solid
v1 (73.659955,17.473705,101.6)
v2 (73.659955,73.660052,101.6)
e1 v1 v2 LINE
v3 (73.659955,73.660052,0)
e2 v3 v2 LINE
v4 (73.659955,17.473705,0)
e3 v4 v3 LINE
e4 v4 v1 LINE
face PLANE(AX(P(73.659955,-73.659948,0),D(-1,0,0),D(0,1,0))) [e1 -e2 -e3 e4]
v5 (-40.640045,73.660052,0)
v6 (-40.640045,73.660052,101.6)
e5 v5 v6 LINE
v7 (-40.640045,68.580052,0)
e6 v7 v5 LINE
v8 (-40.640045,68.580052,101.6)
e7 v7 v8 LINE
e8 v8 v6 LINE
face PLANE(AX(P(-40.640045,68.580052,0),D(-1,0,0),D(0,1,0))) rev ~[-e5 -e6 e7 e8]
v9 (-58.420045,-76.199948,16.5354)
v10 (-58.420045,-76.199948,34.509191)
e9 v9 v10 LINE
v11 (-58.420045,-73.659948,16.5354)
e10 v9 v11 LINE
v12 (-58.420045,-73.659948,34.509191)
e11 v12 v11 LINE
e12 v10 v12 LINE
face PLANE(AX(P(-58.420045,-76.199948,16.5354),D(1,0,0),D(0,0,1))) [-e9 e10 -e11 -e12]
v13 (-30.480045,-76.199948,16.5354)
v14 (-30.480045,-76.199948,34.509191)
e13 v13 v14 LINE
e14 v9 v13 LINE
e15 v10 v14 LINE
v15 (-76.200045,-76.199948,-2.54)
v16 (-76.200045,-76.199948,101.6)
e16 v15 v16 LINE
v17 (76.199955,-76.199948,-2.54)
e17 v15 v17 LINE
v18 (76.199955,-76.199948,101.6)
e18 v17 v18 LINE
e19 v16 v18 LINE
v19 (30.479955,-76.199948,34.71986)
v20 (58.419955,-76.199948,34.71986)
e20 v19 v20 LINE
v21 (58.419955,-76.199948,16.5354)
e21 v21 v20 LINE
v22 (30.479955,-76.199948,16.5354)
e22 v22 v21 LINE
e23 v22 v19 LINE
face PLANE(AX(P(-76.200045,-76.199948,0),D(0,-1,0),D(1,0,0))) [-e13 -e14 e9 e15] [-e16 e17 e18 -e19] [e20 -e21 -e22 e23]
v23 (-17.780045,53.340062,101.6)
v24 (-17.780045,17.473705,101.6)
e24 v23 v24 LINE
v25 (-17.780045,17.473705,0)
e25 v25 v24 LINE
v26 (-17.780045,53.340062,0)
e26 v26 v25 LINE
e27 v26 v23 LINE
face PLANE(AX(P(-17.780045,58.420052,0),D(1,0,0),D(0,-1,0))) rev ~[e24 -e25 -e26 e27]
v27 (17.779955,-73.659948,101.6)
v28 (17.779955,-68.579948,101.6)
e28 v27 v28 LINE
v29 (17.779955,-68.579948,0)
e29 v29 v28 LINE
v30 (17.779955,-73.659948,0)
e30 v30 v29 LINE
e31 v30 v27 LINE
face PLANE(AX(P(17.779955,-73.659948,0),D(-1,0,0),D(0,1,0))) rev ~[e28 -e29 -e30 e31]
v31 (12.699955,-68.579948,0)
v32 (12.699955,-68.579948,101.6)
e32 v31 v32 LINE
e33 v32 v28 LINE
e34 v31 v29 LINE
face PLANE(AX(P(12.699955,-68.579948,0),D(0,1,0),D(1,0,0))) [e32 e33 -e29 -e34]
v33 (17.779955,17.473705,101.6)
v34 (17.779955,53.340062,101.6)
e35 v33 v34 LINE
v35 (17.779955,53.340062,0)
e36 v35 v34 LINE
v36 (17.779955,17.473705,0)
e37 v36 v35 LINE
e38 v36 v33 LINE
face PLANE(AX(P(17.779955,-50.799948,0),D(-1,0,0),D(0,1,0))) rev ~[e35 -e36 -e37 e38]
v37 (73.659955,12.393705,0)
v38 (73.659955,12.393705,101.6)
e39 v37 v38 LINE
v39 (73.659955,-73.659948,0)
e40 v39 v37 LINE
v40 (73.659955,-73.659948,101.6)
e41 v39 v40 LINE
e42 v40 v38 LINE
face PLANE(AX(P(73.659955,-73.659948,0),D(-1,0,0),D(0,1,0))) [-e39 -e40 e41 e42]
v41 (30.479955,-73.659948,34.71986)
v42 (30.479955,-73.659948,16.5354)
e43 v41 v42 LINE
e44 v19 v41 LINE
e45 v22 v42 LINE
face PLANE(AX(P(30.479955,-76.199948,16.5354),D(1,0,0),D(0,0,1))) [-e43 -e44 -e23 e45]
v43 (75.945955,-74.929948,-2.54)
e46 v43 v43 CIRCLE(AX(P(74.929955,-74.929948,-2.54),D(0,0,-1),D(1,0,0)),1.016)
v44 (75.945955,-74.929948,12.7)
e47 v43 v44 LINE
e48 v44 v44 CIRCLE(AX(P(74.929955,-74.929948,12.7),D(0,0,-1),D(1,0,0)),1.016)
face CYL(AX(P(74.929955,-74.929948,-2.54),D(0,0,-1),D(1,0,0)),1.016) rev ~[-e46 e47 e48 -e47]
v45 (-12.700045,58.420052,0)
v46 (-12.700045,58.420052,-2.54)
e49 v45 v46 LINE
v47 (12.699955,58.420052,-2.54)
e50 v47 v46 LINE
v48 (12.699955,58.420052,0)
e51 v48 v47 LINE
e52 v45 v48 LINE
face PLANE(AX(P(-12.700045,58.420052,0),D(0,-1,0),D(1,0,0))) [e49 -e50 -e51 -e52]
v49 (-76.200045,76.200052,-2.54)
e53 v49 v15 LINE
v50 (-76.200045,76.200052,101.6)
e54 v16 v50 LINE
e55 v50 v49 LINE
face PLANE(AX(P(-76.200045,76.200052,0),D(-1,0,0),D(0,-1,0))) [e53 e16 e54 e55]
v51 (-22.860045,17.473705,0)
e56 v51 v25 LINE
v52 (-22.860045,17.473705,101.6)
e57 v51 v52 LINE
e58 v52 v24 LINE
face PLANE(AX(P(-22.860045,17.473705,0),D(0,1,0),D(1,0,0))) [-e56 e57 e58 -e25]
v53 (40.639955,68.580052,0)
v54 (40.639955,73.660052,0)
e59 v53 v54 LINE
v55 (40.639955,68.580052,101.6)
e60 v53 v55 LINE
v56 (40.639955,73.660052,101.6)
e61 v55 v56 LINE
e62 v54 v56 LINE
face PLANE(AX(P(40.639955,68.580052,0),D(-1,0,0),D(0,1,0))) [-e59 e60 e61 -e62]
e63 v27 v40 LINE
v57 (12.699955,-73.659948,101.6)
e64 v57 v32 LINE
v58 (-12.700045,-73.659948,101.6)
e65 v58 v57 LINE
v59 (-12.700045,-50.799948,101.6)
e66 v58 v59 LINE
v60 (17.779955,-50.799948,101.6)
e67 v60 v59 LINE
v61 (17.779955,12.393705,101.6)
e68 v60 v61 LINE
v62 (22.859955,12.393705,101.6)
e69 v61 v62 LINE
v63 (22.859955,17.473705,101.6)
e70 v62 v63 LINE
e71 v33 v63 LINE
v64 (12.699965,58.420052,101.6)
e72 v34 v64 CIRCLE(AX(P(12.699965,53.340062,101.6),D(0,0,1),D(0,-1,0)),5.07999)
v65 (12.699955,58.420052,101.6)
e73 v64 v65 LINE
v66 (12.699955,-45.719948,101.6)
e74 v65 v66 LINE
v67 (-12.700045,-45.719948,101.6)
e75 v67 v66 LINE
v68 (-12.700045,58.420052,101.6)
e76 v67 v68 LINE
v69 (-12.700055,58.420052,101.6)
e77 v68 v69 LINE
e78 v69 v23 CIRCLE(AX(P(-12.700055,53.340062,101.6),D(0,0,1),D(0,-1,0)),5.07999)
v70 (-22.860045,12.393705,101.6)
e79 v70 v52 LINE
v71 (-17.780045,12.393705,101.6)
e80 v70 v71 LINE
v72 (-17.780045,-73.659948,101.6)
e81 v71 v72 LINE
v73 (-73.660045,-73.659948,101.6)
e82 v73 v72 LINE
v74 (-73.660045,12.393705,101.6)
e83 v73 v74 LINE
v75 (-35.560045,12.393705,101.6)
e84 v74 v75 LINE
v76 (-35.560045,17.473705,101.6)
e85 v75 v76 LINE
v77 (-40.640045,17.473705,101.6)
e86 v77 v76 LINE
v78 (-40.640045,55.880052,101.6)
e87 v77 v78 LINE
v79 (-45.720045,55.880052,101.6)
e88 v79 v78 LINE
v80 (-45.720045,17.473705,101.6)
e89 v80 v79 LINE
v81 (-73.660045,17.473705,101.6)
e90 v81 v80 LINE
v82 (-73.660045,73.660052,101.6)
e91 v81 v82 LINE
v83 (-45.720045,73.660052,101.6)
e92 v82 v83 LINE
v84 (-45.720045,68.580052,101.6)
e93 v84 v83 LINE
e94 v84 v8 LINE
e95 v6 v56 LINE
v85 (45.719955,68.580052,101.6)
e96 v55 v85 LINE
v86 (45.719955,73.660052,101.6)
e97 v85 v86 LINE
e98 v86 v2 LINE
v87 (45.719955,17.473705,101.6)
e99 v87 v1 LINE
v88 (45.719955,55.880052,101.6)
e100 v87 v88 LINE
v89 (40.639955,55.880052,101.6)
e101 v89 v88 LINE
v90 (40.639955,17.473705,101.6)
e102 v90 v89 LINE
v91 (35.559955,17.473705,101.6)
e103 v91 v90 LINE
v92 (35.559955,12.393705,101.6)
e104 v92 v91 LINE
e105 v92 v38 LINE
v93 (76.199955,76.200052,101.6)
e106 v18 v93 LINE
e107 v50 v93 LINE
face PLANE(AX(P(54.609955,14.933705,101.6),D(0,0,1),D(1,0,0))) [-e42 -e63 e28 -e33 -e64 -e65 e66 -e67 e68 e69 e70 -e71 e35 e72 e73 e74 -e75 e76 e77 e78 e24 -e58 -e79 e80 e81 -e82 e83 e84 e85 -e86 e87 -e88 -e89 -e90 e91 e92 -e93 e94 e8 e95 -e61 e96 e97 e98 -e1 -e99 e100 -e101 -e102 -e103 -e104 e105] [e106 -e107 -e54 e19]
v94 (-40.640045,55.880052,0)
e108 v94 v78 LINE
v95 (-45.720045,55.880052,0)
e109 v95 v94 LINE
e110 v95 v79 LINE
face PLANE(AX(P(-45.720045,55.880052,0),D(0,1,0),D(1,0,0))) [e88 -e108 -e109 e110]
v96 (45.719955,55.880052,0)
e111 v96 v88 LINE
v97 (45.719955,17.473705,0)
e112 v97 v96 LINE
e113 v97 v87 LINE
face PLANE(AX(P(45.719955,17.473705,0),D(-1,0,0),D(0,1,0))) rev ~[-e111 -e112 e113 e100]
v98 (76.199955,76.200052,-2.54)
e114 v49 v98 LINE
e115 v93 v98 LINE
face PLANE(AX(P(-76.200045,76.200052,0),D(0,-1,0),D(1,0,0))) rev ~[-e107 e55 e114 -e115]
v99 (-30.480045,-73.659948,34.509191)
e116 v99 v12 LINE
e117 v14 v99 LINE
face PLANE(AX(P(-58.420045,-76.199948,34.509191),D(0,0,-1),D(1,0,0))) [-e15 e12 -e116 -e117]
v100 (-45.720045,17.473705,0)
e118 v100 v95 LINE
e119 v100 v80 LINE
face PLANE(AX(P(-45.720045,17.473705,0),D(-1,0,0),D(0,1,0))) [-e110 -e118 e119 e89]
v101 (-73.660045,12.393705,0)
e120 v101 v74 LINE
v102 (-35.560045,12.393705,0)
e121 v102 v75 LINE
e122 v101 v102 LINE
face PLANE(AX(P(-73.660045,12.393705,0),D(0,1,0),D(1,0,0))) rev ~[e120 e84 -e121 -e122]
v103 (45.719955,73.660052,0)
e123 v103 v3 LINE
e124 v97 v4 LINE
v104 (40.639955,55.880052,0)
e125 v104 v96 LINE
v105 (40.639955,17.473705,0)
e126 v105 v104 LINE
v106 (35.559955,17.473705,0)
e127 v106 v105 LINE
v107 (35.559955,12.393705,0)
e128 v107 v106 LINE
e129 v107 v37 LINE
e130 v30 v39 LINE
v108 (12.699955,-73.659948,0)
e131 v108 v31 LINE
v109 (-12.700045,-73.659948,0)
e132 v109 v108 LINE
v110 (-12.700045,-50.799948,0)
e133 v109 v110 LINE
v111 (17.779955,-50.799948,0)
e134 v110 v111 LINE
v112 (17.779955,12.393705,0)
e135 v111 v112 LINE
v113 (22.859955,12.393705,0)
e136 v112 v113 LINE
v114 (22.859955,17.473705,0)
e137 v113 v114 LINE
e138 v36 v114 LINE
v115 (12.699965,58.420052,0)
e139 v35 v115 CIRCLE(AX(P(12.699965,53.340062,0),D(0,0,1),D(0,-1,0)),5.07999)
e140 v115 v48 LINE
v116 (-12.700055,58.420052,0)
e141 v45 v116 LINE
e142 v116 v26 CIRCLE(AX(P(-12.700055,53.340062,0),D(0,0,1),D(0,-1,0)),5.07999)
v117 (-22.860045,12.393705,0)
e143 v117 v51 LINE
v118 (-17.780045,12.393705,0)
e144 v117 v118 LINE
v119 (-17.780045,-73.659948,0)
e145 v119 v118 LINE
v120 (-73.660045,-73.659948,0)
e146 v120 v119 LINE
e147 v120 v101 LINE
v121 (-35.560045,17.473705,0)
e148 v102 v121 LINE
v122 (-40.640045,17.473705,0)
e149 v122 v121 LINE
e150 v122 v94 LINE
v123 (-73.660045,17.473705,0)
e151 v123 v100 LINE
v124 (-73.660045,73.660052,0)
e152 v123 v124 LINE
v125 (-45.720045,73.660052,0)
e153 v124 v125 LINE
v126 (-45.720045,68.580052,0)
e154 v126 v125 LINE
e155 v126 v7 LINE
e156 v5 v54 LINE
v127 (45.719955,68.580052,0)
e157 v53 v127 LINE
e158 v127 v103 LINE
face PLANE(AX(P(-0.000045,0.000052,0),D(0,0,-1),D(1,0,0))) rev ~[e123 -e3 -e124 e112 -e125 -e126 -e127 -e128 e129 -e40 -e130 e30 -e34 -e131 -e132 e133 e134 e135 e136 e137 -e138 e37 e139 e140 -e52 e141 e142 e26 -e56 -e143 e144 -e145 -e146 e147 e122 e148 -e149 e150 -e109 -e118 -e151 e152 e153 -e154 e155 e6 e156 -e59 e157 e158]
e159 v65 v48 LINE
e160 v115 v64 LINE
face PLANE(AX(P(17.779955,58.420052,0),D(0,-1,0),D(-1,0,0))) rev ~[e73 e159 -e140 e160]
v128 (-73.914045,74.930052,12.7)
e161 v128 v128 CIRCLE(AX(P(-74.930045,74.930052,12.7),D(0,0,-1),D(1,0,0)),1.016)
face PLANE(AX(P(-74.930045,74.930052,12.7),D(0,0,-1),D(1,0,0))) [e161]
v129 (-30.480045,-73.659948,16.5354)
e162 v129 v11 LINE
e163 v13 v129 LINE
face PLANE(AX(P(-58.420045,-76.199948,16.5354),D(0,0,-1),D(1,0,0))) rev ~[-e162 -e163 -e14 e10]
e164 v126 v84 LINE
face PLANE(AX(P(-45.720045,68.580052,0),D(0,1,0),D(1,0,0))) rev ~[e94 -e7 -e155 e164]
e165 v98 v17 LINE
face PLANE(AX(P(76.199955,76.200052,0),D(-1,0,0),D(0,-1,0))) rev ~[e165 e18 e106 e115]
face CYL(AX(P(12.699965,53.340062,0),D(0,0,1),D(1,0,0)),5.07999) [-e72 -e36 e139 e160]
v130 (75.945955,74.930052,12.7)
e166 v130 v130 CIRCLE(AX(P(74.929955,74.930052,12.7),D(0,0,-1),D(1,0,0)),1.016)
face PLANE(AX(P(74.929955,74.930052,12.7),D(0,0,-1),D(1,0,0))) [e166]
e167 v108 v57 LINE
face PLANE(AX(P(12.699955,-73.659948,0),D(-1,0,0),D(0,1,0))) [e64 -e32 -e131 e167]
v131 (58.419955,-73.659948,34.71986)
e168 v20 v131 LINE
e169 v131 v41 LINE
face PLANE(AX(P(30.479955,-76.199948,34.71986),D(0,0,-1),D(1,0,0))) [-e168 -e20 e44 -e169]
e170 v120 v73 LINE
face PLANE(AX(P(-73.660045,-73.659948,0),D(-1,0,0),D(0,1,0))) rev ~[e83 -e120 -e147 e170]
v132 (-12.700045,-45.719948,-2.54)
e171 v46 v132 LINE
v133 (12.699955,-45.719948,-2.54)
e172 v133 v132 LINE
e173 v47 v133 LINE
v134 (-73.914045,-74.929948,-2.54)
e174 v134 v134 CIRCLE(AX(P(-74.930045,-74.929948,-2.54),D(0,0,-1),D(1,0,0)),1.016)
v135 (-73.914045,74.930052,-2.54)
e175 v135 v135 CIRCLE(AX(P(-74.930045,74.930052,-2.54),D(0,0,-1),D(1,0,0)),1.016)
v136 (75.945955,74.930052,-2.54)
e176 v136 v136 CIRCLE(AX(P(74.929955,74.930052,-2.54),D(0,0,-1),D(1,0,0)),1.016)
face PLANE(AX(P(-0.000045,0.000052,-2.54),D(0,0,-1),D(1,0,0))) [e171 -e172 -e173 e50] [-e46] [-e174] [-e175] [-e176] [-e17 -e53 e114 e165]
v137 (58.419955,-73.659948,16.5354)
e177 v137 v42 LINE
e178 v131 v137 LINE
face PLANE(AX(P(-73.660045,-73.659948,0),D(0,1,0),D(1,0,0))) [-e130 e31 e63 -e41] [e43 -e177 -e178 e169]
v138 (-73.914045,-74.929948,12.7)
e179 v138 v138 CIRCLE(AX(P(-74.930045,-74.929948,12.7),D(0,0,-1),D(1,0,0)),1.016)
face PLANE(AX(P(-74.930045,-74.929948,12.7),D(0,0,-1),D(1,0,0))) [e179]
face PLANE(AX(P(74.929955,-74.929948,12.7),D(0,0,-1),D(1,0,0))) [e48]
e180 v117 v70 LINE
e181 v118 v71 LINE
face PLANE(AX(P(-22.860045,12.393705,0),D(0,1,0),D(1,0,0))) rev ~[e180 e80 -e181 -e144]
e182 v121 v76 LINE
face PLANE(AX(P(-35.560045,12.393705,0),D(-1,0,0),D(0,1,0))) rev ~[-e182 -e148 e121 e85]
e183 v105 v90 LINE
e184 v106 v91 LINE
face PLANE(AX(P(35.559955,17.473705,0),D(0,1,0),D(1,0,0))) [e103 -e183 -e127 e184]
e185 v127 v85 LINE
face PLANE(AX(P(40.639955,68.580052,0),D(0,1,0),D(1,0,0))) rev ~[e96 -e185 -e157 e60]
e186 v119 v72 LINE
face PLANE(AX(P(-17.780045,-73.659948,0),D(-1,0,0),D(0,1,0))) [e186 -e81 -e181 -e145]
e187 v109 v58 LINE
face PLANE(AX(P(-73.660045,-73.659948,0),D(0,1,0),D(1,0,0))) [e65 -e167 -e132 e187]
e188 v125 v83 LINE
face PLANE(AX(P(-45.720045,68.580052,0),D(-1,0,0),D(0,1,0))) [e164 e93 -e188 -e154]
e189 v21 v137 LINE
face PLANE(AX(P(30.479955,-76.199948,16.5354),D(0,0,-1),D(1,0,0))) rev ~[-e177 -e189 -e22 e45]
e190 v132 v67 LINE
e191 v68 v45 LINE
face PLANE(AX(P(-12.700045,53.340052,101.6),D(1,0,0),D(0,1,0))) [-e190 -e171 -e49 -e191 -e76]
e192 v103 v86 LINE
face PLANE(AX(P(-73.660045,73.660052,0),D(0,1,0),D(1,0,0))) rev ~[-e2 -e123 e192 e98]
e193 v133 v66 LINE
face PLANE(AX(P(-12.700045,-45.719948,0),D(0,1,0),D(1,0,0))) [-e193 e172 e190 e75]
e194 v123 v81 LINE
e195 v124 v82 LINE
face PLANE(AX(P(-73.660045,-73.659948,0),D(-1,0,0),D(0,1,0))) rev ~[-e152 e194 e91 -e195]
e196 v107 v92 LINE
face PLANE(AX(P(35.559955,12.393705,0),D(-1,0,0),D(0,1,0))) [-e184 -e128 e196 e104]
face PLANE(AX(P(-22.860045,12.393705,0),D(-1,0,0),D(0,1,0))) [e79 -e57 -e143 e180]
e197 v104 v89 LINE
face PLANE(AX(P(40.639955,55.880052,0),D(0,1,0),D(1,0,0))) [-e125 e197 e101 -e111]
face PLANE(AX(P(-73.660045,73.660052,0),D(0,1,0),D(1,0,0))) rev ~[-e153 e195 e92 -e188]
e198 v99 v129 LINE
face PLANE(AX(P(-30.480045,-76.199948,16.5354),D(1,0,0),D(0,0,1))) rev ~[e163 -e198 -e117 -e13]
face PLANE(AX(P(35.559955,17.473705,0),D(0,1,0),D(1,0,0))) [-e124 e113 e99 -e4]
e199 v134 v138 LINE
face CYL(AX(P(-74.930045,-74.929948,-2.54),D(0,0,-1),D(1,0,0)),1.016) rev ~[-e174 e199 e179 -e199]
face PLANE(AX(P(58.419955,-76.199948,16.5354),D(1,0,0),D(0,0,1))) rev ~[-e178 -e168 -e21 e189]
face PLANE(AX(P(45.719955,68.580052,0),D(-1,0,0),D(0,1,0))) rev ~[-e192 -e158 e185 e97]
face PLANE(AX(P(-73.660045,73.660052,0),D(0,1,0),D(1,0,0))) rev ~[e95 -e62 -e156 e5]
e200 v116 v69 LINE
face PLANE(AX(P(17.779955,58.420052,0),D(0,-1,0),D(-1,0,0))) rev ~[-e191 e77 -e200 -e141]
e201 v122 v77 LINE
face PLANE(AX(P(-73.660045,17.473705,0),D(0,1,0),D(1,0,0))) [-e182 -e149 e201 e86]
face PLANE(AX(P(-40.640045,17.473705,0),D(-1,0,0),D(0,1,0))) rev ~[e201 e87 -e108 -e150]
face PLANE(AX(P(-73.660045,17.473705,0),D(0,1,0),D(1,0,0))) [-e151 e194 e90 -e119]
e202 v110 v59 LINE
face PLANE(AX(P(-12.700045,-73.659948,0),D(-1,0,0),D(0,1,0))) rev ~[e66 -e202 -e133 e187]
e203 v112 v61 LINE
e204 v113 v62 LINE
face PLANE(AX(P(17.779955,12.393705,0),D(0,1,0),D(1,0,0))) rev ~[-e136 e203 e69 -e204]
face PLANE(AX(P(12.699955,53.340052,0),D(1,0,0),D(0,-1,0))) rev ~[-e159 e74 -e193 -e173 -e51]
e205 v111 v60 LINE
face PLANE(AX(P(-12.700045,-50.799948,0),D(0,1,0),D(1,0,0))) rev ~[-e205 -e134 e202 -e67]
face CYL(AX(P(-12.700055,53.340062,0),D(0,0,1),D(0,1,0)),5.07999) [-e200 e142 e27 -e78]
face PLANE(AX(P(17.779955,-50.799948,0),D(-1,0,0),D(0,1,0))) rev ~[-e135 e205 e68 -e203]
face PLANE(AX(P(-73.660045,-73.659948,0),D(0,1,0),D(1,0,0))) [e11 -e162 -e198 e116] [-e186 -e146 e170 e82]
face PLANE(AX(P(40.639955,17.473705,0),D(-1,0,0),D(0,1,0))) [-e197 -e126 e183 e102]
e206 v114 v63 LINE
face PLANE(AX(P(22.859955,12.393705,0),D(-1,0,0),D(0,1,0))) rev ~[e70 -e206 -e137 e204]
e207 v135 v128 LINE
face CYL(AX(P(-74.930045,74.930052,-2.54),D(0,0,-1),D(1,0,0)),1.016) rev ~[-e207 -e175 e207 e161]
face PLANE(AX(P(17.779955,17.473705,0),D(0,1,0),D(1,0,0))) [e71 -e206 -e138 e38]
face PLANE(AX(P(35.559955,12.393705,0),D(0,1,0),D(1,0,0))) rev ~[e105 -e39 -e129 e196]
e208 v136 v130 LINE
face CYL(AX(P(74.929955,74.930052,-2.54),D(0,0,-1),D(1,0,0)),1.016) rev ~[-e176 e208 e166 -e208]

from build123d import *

# Parameters (mm, degrees)
F0_W      = 152.4
F0_H      = 152.4
F0_W_2    = 147.32
F0_H_2    = 147.32
F1_DEPTH  = 101.6
F2_W      = 152.4
F2_H      = 152.4
F3_DEPTH  = 2.54
F4_W      = 27.94
F4_H      = 18.1844604351
F4_H_2    = 17.9737907264
F5_DEPTH  = 25.4
F7_DEPTH  = 101.6
F8_W      = 25.4
F8_H      = 5.08
F9_DEPTH  = 101.6
F10_W     = 25.4
F10_H     = 5.08
F11_DEPTH = 101.6
F12_W     = 5.08
F12_H     = 5.08
F13_DEPTH = 101.6
F14_W     = 38.1
F14_H     = 5.08
F15_DEPTH = 101.6
F16_W     = 5.08
F16_H     = 38.4063468442
F16_H_2   = 5.08
F17_DEPTH = 101.6
F18_W     = 25.4
F18_H     = 104.14
F19_DEPTH = 25.4
F20_R     = 5.07999
F21_W     = 5.08
F21_H     = 5.08
F21_W_2   = 38.1
F21_H_2   = 22.86
F22_DEPTH = 101.6
F23_R     = 1.016
F24_DEPTH = 15.24


# Not quite as in the source:
# - a fillet or chamfer is up to 0.001 mm smaller than in the source, because OpenCascade refuses the exact size


with BuildPart() as f1:
    # F0 (on Top) → F1 (new body)
    with BuildSketch(Plane.XY):
        with Locations((-4.47035e-05, 5.21541e-05)):
            Rectangle(F0_W, F0_H)
        with Locations((-4.47035e-05, 5.21541e-05)):
            Rectangle(F0_W_2, F0_H_2, mode=Mode.SUBTRACT)
    extrude(amount=F1_DEPTH)

    # F2 (on face) → F3 (join)
    with BuildSketch(Plane(origin=(0, 0, 0), x_dir=(1, 0, 0), z_dir=(0, 0, -1))):
        with Locations((-4.47035e-05, -5.21541e-05)):
            Rectangle(F2_W, F2_H)
    extrude(amount=F3_DEPTH)

    # F4 (on face) → F5 (cut)
    with BuildSketch(Plane.XZ.offset(76.1999478459)):
        with Locations((44.4499552965, 25.6276302175)):
            Rectangle(F4_W, F4_H)
        with Locations((-44.4500447035, 25.5222953632)):
            Rectangle(F4_W, F4_H_2)
    extrude(amount=-F5_DEPTH, mode=Mode.SUBTRACT)

    # F6 (on face) → F7 (join)
    with BuildSketch(Plane.XY):
        Polygon((-17.7800447035, 58.4200521541), (-17.7800447035, -50.7999478459), (-12.7000447035, -50.7999478459), (-12.7000447035, 53.3400521541), (12.6999552965, 53.3400521541), (12.6999552965, -50.7999478459), (17.7799552965, -50.7999478459), (17.7799552965, 44.5264838636), (17.7799552965, 58.4200521541), align=None)
    extrude(amount=F7_DEPTH)

    # F8 (on face) → F9 (join)
    with BuildSketch(Plane.XY):
        with Locations((-4.47035e-05, -48.2599478459)):
            Rectangle(F8_W, F8_H)
    extrude(amount=F9_DEPTH)

    # F10 (on face) → F11 (cut)
    with BuildSketch(Plane.XY.offset(101.6)):
        with Locations((-4.47035e-05, 55.8800521541)):
            Rectangle(F10_W, F10_H)
    extrude(amount=-F11_DEPTH, mode=Mode.SUBTRACT)

    # F12 (on face) → F13 (join)
    with BuildSketch(Plane.XY):
        with Locations((-20.3200447035, 14.9337053099)):
            Rectangle(F12_W, F12_H)
    extrude(amount=F13_DEPTH)

    # F14 (on face) → F15 (join)
    with BuildSketch(Plane.XY):
        with Locations((-54.6100447035, 14.9337053099)):
            Rectangle(F14_W, F14_H)
    extrude(amount=F15_DEPTH)

    # F16 (on face) → F17 (join)
    with BuildSketch(Plane.XY):
        with Locations((-43.1800447035, 36.676878732)):
            Rectangle(F16_W, F16_H)
        with Locations((-43.1800447035, 71.1200521541)):
            Rectangle(F16_W, F16_H_2)
        with Locations((43.1799552965, 71.1200521541)):
            Rectangle(F16_W, F16_H_2)
        with Locations((43.1799552965, 36.676878732)):
            Rectangle(F16_W, F16_H)
    extrude(amount=F17_DEPTH)

    # F18 (on face) → F19 (cut)
    with BuildSketch(Plane.XY):
        with Locations((-4.47035e-05, 6.3500521541)):
            Rectangle(F18_W, F18_H)
    extrude(amount=-F19_DEPTH, mode=Mode.SUBTRACT)

    # F20 (radius 5.08 in the source; OpenCascade refuses exactly that, so slightly less here)
    f20_edges = [f1.edges().sort_by_distance(p)[0] for p in [
        (-17.780045, 58.420052, 50.8),
        (17.779955, 58.420052, 50.8),
    ]]
    fillet(f20_edges, radius=F20_R)

    # F21 (on face) → F22 (join)
    with BuildSketch(Plane.XY):
        with Locations((20.3199552965, 14.9337053099)):
            Rectangle(F21_W, F21_H)
        with Locations((54.6099552965, 14.9337053099)):
            Rectangle(F21_W_2, F21_H)
        with Locations((-15.2400447035, -62.2299478459)):
            Rectangle(F21_W, F21_H_2)
        with Locations((15.2399552965, -71.1199478459)):
            Rectangle(F21_W, F21_H)
    extrude(amount=F22_DEPTH)

    # F23 (on face) → F24 (cut)
    with BuildSketch(Plane(origin=(0, 0, -2.54), x_dir=(1, 0, 0), z_dir=(0, 0, -1))):
        with Locations((-74.9300447035, 74.9299478459)):
            Circle(F23_R)
        with Locations((74.9299552965, 74.9299478459)):
            Circle(F23_R)
        with Locations((-74.9300447035, -74.9300521541)):
            Circle(F23_R)
        with Locations((74.9299552965, -74.9300521541)):
            Circle(F23_R)
    extrude(amount=-F24_DEPTH, mode=Mode.SUBTRACT)


solid = f1.part
